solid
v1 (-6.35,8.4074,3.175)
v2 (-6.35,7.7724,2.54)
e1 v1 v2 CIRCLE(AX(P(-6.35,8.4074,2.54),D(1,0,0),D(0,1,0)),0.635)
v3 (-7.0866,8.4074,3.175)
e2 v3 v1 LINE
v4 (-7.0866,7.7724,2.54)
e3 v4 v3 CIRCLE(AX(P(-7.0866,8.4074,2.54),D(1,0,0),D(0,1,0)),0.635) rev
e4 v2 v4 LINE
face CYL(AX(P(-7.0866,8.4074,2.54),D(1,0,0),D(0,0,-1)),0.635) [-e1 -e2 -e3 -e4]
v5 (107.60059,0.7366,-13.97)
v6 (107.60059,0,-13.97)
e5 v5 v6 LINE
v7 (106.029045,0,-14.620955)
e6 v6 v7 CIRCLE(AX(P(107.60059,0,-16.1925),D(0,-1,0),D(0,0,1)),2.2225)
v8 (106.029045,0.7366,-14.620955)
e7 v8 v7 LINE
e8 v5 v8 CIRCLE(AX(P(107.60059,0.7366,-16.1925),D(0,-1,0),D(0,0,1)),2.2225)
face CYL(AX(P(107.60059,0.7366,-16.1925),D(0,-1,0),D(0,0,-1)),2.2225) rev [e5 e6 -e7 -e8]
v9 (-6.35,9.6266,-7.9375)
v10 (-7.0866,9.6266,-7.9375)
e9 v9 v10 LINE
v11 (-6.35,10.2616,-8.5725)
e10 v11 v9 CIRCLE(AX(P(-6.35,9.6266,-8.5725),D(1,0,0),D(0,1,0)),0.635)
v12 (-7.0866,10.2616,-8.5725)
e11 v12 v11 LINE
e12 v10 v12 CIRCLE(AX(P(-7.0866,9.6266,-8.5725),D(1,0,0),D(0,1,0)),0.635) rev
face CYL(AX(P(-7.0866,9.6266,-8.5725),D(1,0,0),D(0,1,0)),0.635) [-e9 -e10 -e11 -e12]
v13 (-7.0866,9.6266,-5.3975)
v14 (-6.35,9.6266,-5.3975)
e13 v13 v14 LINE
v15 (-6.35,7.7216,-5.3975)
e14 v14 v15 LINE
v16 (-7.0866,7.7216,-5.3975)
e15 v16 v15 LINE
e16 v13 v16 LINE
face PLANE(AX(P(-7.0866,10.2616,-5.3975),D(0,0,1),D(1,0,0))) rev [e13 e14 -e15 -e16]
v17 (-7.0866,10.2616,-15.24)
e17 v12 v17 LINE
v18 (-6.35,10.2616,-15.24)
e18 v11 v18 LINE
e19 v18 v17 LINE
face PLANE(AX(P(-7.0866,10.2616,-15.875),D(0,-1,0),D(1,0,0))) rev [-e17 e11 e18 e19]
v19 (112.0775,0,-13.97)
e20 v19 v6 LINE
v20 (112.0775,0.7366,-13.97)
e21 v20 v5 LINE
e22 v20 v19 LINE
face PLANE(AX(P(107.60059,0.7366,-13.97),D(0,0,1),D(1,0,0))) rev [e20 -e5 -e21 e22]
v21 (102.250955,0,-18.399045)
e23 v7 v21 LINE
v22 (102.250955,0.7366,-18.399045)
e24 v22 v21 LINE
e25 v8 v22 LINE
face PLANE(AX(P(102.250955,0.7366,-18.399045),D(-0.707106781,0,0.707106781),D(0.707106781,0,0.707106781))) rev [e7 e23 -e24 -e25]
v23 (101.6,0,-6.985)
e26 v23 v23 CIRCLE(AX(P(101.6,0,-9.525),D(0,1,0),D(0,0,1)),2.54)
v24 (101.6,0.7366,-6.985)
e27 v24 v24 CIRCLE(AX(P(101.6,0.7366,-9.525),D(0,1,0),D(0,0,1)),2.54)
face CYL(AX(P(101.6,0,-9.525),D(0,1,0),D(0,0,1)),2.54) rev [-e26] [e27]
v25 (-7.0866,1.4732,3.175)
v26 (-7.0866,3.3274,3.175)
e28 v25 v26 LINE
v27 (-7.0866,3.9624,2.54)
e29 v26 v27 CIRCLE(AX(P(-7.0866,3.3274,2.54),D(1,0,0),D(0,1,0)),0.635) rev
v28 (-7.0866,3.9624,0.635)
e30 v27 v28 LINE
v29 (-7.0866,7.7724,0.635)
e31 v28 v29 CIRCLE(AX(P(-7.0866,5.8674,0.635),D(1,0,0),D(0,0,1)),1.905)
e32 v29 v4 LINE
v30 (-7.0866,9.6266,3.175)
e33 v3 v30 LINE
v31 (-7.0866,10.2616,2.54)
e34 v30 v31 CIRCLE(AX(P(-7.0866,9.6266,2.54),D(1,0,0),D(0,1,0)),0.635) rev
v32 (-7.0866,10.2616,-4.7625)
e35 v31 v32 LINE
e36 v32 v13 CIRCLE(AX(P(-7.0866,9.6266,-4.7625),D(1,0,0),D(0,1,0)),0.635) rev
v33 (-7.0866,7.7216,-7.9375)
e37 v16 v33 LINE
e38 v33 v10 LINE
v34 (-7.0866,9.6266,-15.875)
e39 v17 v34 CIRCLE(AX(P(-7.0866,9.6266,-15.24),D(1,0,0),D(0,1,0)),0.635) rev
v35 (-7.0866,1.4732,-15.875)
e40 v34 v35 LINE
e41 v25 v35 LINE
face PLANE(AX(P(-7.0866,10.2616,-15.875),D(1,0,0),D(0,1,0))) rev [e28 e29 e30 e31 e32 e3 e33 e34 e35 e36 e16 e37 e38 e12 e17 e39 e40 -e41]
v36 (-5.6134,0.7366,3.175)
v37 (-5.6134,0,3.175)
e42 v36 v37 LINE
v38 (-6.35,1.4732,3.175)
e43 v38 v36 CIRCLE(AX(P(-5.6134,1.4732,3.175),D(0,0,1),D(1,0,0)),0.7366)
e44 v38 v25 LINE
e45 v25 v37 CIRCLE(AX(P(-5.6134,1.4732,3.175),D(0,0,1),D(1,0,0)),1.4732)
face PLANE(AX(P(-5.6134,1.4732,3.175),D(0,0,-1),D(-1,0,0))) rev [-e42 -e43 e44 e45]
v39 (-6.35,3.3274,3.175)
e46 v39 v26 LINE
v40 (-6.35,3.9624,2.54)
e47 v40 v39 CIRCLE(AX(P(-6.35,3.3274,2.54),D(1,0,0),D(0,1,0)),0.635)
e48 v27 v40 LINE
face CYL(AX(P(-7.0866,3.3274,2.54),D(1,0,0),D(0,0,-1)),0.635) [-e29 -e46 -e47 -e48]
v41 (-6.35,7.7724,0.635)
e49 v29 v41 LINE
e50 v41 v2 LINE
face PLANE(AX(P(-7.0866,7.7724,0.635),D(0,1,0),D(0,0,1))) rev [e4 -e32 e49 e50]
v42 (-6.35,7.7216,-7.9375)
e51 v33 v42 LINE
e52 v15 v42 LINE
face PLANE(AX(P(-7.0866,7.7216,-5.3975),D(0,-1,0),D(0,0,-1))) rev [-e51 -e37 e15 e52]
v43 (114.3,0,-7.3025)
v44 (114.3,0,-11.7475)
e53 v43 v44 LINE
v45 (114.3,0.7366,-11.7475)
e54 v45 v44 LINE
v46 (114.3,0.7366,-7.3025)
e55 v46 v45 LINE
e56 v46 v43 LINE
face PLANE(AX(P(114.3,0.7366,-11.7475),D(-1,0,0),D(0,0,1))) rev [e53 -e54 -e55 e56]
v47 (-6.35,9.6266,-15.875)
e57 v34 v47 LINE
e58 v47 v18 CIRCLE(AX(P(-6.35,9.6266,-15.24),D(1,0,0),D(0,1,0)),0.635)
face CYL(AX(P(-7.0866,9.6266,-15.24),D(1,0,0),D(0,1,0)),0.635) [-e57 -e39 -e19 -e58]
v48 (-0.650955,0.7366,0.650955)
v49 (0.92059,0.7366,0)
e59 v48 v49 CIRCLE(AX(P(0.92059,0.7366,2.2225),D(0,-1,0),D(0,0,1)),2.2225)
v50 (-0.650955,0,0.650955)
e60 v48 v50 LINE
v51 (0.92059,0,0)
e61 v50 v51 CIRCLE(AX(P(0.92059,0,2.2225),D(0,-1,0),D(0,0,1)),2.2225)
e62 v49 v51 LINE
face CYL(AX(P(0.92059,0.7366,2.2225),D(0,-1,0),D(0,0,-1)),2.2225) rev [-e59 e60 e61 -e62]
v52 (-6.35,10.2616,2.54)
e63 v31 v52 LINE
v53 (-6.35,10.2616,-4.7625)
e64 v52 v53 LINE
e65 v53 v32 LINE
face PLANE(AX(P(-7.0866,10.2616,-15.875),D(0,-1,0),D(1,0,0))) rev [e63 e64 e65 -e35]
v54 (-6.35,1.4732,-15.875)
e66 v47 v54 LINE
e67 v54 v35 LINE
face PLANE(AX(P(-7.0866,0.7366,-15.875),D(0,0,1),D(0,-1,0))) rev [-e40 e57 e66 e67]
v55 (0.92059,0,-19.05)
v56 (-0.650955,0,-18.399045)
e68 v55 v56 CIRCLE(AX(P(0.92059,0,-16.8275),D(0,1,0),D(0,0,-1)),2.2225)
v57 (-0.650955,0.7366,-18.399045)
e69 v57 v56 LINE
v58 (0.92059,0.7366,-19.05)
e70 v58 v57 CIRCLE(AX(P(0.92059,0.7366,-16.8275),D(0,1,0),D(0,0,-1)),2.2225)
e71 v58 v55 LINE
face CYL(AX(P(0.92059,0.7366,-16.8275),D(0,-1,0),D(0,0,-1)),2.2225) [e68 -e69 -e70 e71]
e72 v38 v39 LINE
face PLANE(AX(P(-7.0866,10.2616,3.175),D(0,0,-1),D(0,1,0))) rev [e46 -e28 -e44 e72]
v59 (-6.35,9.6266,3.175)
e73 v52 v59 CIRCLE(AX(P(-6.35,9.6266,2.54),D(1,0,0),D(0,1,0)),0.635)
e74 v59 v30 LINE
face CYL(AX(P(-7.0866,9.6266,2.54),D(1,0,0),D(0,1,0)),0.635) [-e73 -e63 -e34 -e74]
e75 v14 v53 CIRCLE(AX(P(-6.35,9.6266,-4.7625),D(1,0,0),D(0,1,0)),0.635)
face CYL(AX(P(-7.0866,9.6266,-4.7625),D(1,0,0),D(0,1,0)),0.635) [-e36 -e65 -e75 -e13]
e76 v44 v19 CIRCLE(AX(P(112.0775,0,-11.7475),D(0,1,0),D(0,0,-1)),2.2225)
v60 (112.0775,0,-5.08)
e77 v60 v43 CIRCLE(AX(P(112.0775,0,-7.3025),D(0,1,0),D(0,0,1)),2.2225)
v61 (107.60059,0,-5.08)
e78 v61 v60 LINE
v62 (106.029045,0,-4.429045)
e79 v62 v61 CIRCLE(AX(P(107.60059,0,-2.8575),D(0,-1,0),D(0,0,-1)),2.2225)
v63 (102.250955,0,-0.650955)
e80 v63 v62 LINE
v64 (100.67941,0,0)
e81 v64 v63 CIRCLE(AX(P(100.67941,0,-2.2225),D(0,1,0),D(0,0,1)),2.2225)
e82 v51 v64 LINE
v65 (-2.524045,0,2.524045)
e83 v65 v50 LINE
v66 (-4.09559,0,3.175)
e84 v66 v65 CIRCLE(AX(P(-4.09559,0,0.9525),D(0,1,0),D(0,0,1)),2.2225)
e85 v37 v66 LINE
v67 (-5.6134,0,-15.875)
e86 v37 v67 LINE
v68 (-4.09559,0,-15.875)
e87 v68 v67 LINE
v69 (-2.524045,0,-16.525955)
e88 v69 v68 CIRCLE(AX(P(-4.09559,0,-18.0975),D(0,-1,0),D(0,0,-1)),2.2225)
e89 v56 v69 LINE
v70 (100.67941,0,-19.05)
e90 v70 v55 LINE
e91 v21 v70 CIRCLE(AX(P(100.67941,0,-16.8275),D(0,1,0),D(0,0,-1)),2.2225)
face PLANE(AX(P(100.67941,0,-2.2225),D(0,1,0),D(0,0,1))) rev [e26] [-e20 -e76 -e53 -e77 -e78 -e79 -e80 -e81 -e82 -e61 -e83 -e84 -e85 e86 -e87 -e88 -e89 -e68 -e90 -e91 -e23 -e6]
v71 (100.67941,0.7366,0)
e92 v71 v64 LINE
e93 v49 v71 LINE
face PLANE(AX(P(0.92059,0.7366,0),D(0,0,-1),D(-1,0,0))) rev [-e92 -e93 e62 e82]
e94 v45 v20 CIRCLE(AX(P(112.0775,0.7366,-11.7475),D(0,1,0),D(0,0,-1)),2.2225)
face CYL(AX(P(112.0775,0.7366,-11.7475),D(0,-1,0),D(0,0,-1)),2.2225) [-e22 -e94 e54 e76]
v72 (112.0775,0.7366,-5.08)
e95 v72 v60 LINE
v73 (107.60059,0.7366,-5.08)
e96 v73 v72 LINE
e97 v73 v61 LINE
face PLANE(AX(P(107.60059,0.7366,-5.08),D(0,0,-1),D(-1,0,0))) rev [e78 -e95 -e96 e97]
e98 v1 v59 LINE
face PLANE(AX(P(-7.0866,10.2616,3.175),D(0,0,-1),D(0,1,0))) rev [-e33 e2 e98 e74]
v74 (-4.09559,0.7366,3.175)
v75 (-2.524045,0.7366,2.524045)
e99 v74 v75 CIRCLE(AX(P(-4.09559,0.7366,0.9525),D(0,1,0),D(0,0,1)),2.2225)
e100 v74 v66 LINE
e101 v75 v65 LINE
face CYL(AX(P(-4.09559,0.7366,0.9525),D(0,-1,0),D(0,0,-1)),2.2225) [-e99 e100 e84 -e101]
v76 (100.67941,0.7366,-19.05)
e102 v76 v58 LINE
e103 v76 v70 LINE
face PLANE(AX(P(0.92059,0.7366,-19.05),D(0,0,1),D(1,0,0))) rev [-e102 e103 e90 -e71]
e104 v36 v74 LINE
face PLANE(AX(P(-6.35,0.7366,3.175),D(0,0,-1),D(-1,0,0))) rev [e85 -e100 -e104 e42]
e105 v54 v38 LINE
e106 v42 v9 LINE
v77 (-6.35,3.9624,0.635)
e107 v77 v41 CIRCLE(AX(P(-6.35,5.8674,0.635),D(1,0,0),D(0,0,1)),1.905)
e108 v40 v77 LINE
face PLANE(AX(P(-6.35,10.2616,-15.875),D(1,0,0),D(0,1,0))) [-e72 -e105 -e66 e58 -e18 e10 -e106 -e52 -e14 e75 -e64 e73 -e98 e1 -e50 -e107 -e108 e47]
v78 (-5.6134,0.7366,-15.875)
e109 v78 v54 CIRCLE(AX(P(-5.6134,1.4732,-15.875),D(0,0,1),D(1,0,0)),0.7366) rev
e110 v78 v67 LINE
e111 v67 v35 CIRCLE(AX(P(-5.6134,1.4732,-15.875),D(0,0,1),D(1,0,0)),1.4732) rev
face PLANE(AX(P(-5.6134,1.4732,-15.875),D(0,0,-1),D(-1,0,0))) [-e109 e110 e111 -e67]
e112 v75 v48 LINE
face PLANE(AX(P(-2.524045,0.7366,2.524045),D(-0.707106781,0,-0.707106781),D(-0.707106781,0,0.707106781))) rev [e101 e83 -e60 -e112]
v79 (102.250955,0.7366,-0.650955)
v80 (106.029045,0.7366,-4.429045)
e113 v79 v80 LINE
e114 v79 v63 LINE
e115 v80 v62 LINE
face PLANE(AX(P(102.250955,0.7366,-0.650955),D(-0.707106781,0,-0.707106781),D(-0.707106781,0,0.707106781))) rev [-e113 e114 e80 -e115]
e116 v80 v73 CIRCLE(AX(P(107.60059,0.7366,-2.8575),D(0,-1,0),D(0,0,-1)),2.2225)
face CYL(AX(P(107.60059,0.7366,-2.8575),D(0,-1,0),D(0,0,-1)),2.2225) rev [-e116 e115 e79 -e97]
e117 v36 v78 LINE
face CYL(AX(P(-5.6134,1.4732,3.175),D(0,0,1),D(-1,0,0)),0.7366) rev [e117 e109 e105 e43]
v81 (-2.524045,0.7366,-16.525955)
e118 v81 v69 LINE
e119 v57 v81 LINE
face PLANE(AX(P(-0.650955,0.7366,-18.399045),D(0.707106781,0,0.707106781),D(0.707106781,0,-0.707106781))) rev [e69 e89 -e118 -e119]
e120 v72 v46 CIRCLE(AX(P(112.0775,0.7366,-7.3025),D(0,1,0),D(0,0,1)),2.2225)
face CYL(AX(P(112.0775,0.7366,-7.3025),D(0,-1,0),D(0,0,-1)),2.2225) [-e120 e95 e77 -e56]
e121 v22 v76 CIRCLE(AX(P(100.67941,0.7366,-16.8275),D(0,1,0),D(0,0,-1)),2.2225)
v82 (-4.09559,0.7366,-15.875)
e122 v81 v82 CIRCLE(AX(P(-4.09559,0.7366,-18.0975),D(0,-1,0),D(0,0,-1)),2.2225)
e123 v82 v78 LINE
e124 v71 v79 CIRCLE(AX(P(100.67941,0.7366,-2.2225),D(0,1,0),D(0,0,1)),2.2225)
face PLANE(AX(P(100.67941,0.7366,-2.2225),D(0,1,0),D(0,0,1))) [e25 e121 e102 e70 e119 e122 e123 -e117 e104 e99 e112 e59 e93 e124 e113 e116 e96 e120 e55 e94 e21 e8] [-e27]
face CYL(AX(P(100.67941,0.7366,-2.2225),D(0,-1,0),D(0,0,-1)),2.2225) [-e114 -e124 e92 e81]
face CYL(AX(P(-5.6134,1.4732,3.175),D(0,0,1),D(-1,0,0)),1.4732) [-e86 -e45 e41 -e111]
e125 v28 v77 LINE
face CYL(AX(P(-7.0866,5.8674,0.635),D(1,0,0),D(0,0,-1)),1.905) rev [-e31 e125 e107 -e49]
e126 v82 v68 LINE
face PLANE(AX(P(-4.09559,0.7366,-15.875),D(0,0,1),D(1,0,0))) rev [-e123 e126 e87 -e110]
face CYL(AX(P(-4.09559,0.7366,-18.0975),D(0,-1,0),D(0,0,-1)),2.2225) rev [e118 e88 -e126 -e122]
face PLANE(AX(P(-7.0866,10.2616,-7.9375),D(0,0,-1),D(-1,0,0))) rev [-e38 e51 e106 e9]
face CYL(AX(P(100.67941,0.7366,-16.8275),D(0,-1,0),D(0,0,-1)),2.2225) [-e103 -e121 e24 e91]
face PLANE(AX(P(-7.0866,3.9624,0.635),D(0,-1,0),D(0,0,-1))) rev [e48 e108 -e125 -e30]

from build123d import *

# Parameters (mm, degrees)
SM_BASE_FLANGE_2_DEPTH           = 0.7366
SKETCH4_R                        = 2.54
CUT_EXTRUDE_3_DEPTH              = 116.878967374
SM_EDGE_FLANGE_4_STRIP_W         = 4.4196
SM_EDGE_FLANGE_4_STRIP_H         = 0.7366
SM_EDGE_FLANGE_4_STRIP_CUT_DEPTH = 19.05
SM_EDGE_FLANGE_4_DEPTH           = 19.05
SKETCH8_W                        = 2.54
SKETCH8_H                        = 2.54
CUT_EXTRUDE_5_DEPTH              = 123.574978827
OTHER_START                      = -7.0866
OTHER_6_DEPTH                    = 0.7366


# Read off the part's stored shape, not the designer's step: 6
# Sheet-metal steps are written as plain solids
with BuildPart() as part:
    # Sketch1 → 2 (new body)
    with BuildSketch(Plane(origin=(0, 0, 0), x_dir=(1, 0, 0), z_dir=(0, 1, 0))):
        with BuildLine():
            Line((0.920589642, 0), (100.679410358, 0))
            ThreePointArc((100.679410358, 0), (101.529924286, 0.169177739), (102.250955179, 0.650955179))
            Line((102.250955179, 0.650955179), (106.029044821, 4.429044821))
            ThreePointArc((106.029044821, 4.429044821), (106.750075714, 4.910822261), (107.600589642, 5.08))
            Line((107.600589642, 5.08), (112.0775, 5.08))
            ThreePointArc((112.0775, 5.08), (113.649044821, 5.730955179), (114.3, 7.3025))
            Line((114.3, 7.3025), (114.3, 11.7475))
            ThreePointArc((114.3, 11.7475), (113.649044821, 13.319044821), (112.0775, 13.97))
            Line((112.0775, 13.97), (107.600589642, 13.97))
            ThreePointArc((107.600589642, 13.97), (106.750075714, 14.139177739), (106.029044821, 14.620955179))
            Line((106.029044821, 14.620955179), (102.250955179, 18.399044821))
            ThreePointArc((102.250955179, 18.399044821), (101.529924286, 18.880822261), (100.679410358, 19.05))
            Line((100.679410358, 19.05), (0.920589642, 19.05))
            ThreePointArc((0.920589642, 19.05), (0.070075714, 18.880822261), (-0.650955179, 18.399044821))
            Line((-0.650955179, 18.399044821), (-2.524044821, 16.525955179))
            ThreePointArc((-2.524044821, 16.525955179), (-3.245075714, 16.044177739), (-4.095589642, 15.875))
            Line((-4.095589642, 15.875), (-6.35, 15.875))
            Line((-6.35, 15.875), (-6.35, -3.175))
            Line((-6.35, -3.175), (-4.095589642, -3.175))
            ThreePointArc((-4.095589642, -3.175), (-3.245075714, -3.005822261), (-2.524044821, -2.524044821))
            Line((-2.524044821, -2.524044821), (-0.650955179, -0.650955179))
            ThreePointArc((-0.650955179, -0.650955179), (0.070075714, -0.169177739), (0.920589642, 0))
        make_face()
    extrude(amount=SM_BASE_FLANGE_2_DEPTH)

    # Sketch4 → 3 (cut, through all)
    with BuildSketch(Plane(origin=(0, 0.7366, 0), x_dir=(-1, 0, 0), z_dir=(0, 1, 0))):
        with Locations(Location((-101.6, -9.525, 0), (0, 0, 90))):
            Circle(SKETCH4_R)
    extrude(amount=-CUT_EXTRUDE_3_DEPTH, mode=Mode.SUBTRACT)

    # 4 strip (across the edge) → 4 strip cut (cut)
    with BuildSketch(Plane(origin=(-6.35, 0.7366, -15.875), x_dir=(1, 0, 0), z_dir=(0, 0, 1))):
        with Locations((-1.4732, -0.3683)):
            Rectangle(SM_EDGE_FLANGE_4_STRIP_W, SM_EDGE_FLANGE_4_STRIP_H)
    extrude(amount=SM_EDGE_FLANGE_4_STRIP_CUT_DEPTH, mode=Mode.SUBTRACT)

    # 4 section (across the edge) → 4 (add)
    with BuildSketch(Plane(origin=(-6.35, 0.7366, -15.875), x_dir=(1, 0, 0), z_dir=(0, 0, 1))):
        with BuildLine():
            Line((-0.7366, 0.7366), (-0.7366, 9.525))
            Line((-0.7366, 9.525), (0, 9.525))
            Line((0, 9.525), (0, 0.7366))
            ThreePointArc((0, 0.7366), (0.215745145, 0.215745145), (0.7366, 0))
            Line((0.7366, 0), (0.7366, -0.7366))
            ThreePointArc((0.7366, -0.7366), (-0.30510971, -0.30510971), (-0.7366, 0.7366))
        make_face()
    extrude(amount=SM_EDGE_FLANGE_4_DEPTH)

    # Sketch8 → 5 (cut, through all)
    with BuildSketch(Plane(origin=(-6.35, 0, 0), x_dir=(0, 0, -1), z_dir=(1, 0, 0))):
        with BuildLine():
            Line((-0.635, 7.7724), (-3.175, 7.7724))
            Line((-3.175, 7.7724), (-3.175, 3.9624))
            Line((-3.175, 3.9624), (-0.635, 3.9624))
            ThreePointArc((-0.635, 3.9624), (1.27, 5.8674), (-0.635, 7.7724))
        make_face()
        with Locations((6.6675, 8.9916)):
            Rectangle(SKETCH8_W, SKETCH8_H)
    extrude(amount=-CUT_EXTRUDE_5_DEPTH, mode=Mode.SUBTRACT)

    # Other 6 outline → Other 6 (cut)
    with BuildSketch(Plane.YZ.offset(OTHER_START)):
        with BuildLine():
            ThreePointArc((3.3274, 3.175), (3.776412806, 2.989012806), (3.9624, 2.54))
            Line((3.9624, 2.54), (3.9624, 3.175))
            Line((3.9624, 3.175), (3.3274, 3.175))
        make_face()
        with BuildLine():
            ThreePointArc((7.7724, 2.54), (7.958387194, 2.989012806), (8.4074, 3.175))
            Line((8.4074, 3.175), (7.7724, 3.175))
            Line((7.7724, 3.175), (7.7724, 2.54))
        make_face()
        with BuildLine():
            Line((10.2616, -5.3975), (10.2616, -4.7625))
            ThreePointArc((10.2616, -4.7625), (10.075612806, -5.211512806), (9.6266, -5.3975))
            Line((9.6266, -5.3975), (10.2616, -5.3975))
        make_face()
        with BuildLine():
            Line((10.2616, 3.175), (9.6266, 3.175))
            ThreePointArc((9.6266, 3.175), (10.075612806, 2.989012806), (10.2616, 2.54))
            Line((10.2616, 2.54), (10.2616, 3.175))
        make_face()
        with BuildLine():
            Line((10.2616, -15.875), (10.2616, -15.24))
            ThreePointArc((10.2616, -15.24), (10.075612806, -15.689012806), (9.6266, -15.875))
            Line((9.6266, -15.875), (10.2616, -15.875))
        make_face()
        with BuildLine():
            ThreePointArc((9.6266, -7.9375), (10.075612806, -8.123487194), (10.2616, -8.5725))
            Line((10.2616, -8.5725), (10.2616, -7.9375))
            Line((10.2616, -7.9375), (9.6266, -7.9375))
        make_face()
    extrude(amount=OTHER_6_DEPTH, mode=Mode.SUBTRACT)


solid = part.part
